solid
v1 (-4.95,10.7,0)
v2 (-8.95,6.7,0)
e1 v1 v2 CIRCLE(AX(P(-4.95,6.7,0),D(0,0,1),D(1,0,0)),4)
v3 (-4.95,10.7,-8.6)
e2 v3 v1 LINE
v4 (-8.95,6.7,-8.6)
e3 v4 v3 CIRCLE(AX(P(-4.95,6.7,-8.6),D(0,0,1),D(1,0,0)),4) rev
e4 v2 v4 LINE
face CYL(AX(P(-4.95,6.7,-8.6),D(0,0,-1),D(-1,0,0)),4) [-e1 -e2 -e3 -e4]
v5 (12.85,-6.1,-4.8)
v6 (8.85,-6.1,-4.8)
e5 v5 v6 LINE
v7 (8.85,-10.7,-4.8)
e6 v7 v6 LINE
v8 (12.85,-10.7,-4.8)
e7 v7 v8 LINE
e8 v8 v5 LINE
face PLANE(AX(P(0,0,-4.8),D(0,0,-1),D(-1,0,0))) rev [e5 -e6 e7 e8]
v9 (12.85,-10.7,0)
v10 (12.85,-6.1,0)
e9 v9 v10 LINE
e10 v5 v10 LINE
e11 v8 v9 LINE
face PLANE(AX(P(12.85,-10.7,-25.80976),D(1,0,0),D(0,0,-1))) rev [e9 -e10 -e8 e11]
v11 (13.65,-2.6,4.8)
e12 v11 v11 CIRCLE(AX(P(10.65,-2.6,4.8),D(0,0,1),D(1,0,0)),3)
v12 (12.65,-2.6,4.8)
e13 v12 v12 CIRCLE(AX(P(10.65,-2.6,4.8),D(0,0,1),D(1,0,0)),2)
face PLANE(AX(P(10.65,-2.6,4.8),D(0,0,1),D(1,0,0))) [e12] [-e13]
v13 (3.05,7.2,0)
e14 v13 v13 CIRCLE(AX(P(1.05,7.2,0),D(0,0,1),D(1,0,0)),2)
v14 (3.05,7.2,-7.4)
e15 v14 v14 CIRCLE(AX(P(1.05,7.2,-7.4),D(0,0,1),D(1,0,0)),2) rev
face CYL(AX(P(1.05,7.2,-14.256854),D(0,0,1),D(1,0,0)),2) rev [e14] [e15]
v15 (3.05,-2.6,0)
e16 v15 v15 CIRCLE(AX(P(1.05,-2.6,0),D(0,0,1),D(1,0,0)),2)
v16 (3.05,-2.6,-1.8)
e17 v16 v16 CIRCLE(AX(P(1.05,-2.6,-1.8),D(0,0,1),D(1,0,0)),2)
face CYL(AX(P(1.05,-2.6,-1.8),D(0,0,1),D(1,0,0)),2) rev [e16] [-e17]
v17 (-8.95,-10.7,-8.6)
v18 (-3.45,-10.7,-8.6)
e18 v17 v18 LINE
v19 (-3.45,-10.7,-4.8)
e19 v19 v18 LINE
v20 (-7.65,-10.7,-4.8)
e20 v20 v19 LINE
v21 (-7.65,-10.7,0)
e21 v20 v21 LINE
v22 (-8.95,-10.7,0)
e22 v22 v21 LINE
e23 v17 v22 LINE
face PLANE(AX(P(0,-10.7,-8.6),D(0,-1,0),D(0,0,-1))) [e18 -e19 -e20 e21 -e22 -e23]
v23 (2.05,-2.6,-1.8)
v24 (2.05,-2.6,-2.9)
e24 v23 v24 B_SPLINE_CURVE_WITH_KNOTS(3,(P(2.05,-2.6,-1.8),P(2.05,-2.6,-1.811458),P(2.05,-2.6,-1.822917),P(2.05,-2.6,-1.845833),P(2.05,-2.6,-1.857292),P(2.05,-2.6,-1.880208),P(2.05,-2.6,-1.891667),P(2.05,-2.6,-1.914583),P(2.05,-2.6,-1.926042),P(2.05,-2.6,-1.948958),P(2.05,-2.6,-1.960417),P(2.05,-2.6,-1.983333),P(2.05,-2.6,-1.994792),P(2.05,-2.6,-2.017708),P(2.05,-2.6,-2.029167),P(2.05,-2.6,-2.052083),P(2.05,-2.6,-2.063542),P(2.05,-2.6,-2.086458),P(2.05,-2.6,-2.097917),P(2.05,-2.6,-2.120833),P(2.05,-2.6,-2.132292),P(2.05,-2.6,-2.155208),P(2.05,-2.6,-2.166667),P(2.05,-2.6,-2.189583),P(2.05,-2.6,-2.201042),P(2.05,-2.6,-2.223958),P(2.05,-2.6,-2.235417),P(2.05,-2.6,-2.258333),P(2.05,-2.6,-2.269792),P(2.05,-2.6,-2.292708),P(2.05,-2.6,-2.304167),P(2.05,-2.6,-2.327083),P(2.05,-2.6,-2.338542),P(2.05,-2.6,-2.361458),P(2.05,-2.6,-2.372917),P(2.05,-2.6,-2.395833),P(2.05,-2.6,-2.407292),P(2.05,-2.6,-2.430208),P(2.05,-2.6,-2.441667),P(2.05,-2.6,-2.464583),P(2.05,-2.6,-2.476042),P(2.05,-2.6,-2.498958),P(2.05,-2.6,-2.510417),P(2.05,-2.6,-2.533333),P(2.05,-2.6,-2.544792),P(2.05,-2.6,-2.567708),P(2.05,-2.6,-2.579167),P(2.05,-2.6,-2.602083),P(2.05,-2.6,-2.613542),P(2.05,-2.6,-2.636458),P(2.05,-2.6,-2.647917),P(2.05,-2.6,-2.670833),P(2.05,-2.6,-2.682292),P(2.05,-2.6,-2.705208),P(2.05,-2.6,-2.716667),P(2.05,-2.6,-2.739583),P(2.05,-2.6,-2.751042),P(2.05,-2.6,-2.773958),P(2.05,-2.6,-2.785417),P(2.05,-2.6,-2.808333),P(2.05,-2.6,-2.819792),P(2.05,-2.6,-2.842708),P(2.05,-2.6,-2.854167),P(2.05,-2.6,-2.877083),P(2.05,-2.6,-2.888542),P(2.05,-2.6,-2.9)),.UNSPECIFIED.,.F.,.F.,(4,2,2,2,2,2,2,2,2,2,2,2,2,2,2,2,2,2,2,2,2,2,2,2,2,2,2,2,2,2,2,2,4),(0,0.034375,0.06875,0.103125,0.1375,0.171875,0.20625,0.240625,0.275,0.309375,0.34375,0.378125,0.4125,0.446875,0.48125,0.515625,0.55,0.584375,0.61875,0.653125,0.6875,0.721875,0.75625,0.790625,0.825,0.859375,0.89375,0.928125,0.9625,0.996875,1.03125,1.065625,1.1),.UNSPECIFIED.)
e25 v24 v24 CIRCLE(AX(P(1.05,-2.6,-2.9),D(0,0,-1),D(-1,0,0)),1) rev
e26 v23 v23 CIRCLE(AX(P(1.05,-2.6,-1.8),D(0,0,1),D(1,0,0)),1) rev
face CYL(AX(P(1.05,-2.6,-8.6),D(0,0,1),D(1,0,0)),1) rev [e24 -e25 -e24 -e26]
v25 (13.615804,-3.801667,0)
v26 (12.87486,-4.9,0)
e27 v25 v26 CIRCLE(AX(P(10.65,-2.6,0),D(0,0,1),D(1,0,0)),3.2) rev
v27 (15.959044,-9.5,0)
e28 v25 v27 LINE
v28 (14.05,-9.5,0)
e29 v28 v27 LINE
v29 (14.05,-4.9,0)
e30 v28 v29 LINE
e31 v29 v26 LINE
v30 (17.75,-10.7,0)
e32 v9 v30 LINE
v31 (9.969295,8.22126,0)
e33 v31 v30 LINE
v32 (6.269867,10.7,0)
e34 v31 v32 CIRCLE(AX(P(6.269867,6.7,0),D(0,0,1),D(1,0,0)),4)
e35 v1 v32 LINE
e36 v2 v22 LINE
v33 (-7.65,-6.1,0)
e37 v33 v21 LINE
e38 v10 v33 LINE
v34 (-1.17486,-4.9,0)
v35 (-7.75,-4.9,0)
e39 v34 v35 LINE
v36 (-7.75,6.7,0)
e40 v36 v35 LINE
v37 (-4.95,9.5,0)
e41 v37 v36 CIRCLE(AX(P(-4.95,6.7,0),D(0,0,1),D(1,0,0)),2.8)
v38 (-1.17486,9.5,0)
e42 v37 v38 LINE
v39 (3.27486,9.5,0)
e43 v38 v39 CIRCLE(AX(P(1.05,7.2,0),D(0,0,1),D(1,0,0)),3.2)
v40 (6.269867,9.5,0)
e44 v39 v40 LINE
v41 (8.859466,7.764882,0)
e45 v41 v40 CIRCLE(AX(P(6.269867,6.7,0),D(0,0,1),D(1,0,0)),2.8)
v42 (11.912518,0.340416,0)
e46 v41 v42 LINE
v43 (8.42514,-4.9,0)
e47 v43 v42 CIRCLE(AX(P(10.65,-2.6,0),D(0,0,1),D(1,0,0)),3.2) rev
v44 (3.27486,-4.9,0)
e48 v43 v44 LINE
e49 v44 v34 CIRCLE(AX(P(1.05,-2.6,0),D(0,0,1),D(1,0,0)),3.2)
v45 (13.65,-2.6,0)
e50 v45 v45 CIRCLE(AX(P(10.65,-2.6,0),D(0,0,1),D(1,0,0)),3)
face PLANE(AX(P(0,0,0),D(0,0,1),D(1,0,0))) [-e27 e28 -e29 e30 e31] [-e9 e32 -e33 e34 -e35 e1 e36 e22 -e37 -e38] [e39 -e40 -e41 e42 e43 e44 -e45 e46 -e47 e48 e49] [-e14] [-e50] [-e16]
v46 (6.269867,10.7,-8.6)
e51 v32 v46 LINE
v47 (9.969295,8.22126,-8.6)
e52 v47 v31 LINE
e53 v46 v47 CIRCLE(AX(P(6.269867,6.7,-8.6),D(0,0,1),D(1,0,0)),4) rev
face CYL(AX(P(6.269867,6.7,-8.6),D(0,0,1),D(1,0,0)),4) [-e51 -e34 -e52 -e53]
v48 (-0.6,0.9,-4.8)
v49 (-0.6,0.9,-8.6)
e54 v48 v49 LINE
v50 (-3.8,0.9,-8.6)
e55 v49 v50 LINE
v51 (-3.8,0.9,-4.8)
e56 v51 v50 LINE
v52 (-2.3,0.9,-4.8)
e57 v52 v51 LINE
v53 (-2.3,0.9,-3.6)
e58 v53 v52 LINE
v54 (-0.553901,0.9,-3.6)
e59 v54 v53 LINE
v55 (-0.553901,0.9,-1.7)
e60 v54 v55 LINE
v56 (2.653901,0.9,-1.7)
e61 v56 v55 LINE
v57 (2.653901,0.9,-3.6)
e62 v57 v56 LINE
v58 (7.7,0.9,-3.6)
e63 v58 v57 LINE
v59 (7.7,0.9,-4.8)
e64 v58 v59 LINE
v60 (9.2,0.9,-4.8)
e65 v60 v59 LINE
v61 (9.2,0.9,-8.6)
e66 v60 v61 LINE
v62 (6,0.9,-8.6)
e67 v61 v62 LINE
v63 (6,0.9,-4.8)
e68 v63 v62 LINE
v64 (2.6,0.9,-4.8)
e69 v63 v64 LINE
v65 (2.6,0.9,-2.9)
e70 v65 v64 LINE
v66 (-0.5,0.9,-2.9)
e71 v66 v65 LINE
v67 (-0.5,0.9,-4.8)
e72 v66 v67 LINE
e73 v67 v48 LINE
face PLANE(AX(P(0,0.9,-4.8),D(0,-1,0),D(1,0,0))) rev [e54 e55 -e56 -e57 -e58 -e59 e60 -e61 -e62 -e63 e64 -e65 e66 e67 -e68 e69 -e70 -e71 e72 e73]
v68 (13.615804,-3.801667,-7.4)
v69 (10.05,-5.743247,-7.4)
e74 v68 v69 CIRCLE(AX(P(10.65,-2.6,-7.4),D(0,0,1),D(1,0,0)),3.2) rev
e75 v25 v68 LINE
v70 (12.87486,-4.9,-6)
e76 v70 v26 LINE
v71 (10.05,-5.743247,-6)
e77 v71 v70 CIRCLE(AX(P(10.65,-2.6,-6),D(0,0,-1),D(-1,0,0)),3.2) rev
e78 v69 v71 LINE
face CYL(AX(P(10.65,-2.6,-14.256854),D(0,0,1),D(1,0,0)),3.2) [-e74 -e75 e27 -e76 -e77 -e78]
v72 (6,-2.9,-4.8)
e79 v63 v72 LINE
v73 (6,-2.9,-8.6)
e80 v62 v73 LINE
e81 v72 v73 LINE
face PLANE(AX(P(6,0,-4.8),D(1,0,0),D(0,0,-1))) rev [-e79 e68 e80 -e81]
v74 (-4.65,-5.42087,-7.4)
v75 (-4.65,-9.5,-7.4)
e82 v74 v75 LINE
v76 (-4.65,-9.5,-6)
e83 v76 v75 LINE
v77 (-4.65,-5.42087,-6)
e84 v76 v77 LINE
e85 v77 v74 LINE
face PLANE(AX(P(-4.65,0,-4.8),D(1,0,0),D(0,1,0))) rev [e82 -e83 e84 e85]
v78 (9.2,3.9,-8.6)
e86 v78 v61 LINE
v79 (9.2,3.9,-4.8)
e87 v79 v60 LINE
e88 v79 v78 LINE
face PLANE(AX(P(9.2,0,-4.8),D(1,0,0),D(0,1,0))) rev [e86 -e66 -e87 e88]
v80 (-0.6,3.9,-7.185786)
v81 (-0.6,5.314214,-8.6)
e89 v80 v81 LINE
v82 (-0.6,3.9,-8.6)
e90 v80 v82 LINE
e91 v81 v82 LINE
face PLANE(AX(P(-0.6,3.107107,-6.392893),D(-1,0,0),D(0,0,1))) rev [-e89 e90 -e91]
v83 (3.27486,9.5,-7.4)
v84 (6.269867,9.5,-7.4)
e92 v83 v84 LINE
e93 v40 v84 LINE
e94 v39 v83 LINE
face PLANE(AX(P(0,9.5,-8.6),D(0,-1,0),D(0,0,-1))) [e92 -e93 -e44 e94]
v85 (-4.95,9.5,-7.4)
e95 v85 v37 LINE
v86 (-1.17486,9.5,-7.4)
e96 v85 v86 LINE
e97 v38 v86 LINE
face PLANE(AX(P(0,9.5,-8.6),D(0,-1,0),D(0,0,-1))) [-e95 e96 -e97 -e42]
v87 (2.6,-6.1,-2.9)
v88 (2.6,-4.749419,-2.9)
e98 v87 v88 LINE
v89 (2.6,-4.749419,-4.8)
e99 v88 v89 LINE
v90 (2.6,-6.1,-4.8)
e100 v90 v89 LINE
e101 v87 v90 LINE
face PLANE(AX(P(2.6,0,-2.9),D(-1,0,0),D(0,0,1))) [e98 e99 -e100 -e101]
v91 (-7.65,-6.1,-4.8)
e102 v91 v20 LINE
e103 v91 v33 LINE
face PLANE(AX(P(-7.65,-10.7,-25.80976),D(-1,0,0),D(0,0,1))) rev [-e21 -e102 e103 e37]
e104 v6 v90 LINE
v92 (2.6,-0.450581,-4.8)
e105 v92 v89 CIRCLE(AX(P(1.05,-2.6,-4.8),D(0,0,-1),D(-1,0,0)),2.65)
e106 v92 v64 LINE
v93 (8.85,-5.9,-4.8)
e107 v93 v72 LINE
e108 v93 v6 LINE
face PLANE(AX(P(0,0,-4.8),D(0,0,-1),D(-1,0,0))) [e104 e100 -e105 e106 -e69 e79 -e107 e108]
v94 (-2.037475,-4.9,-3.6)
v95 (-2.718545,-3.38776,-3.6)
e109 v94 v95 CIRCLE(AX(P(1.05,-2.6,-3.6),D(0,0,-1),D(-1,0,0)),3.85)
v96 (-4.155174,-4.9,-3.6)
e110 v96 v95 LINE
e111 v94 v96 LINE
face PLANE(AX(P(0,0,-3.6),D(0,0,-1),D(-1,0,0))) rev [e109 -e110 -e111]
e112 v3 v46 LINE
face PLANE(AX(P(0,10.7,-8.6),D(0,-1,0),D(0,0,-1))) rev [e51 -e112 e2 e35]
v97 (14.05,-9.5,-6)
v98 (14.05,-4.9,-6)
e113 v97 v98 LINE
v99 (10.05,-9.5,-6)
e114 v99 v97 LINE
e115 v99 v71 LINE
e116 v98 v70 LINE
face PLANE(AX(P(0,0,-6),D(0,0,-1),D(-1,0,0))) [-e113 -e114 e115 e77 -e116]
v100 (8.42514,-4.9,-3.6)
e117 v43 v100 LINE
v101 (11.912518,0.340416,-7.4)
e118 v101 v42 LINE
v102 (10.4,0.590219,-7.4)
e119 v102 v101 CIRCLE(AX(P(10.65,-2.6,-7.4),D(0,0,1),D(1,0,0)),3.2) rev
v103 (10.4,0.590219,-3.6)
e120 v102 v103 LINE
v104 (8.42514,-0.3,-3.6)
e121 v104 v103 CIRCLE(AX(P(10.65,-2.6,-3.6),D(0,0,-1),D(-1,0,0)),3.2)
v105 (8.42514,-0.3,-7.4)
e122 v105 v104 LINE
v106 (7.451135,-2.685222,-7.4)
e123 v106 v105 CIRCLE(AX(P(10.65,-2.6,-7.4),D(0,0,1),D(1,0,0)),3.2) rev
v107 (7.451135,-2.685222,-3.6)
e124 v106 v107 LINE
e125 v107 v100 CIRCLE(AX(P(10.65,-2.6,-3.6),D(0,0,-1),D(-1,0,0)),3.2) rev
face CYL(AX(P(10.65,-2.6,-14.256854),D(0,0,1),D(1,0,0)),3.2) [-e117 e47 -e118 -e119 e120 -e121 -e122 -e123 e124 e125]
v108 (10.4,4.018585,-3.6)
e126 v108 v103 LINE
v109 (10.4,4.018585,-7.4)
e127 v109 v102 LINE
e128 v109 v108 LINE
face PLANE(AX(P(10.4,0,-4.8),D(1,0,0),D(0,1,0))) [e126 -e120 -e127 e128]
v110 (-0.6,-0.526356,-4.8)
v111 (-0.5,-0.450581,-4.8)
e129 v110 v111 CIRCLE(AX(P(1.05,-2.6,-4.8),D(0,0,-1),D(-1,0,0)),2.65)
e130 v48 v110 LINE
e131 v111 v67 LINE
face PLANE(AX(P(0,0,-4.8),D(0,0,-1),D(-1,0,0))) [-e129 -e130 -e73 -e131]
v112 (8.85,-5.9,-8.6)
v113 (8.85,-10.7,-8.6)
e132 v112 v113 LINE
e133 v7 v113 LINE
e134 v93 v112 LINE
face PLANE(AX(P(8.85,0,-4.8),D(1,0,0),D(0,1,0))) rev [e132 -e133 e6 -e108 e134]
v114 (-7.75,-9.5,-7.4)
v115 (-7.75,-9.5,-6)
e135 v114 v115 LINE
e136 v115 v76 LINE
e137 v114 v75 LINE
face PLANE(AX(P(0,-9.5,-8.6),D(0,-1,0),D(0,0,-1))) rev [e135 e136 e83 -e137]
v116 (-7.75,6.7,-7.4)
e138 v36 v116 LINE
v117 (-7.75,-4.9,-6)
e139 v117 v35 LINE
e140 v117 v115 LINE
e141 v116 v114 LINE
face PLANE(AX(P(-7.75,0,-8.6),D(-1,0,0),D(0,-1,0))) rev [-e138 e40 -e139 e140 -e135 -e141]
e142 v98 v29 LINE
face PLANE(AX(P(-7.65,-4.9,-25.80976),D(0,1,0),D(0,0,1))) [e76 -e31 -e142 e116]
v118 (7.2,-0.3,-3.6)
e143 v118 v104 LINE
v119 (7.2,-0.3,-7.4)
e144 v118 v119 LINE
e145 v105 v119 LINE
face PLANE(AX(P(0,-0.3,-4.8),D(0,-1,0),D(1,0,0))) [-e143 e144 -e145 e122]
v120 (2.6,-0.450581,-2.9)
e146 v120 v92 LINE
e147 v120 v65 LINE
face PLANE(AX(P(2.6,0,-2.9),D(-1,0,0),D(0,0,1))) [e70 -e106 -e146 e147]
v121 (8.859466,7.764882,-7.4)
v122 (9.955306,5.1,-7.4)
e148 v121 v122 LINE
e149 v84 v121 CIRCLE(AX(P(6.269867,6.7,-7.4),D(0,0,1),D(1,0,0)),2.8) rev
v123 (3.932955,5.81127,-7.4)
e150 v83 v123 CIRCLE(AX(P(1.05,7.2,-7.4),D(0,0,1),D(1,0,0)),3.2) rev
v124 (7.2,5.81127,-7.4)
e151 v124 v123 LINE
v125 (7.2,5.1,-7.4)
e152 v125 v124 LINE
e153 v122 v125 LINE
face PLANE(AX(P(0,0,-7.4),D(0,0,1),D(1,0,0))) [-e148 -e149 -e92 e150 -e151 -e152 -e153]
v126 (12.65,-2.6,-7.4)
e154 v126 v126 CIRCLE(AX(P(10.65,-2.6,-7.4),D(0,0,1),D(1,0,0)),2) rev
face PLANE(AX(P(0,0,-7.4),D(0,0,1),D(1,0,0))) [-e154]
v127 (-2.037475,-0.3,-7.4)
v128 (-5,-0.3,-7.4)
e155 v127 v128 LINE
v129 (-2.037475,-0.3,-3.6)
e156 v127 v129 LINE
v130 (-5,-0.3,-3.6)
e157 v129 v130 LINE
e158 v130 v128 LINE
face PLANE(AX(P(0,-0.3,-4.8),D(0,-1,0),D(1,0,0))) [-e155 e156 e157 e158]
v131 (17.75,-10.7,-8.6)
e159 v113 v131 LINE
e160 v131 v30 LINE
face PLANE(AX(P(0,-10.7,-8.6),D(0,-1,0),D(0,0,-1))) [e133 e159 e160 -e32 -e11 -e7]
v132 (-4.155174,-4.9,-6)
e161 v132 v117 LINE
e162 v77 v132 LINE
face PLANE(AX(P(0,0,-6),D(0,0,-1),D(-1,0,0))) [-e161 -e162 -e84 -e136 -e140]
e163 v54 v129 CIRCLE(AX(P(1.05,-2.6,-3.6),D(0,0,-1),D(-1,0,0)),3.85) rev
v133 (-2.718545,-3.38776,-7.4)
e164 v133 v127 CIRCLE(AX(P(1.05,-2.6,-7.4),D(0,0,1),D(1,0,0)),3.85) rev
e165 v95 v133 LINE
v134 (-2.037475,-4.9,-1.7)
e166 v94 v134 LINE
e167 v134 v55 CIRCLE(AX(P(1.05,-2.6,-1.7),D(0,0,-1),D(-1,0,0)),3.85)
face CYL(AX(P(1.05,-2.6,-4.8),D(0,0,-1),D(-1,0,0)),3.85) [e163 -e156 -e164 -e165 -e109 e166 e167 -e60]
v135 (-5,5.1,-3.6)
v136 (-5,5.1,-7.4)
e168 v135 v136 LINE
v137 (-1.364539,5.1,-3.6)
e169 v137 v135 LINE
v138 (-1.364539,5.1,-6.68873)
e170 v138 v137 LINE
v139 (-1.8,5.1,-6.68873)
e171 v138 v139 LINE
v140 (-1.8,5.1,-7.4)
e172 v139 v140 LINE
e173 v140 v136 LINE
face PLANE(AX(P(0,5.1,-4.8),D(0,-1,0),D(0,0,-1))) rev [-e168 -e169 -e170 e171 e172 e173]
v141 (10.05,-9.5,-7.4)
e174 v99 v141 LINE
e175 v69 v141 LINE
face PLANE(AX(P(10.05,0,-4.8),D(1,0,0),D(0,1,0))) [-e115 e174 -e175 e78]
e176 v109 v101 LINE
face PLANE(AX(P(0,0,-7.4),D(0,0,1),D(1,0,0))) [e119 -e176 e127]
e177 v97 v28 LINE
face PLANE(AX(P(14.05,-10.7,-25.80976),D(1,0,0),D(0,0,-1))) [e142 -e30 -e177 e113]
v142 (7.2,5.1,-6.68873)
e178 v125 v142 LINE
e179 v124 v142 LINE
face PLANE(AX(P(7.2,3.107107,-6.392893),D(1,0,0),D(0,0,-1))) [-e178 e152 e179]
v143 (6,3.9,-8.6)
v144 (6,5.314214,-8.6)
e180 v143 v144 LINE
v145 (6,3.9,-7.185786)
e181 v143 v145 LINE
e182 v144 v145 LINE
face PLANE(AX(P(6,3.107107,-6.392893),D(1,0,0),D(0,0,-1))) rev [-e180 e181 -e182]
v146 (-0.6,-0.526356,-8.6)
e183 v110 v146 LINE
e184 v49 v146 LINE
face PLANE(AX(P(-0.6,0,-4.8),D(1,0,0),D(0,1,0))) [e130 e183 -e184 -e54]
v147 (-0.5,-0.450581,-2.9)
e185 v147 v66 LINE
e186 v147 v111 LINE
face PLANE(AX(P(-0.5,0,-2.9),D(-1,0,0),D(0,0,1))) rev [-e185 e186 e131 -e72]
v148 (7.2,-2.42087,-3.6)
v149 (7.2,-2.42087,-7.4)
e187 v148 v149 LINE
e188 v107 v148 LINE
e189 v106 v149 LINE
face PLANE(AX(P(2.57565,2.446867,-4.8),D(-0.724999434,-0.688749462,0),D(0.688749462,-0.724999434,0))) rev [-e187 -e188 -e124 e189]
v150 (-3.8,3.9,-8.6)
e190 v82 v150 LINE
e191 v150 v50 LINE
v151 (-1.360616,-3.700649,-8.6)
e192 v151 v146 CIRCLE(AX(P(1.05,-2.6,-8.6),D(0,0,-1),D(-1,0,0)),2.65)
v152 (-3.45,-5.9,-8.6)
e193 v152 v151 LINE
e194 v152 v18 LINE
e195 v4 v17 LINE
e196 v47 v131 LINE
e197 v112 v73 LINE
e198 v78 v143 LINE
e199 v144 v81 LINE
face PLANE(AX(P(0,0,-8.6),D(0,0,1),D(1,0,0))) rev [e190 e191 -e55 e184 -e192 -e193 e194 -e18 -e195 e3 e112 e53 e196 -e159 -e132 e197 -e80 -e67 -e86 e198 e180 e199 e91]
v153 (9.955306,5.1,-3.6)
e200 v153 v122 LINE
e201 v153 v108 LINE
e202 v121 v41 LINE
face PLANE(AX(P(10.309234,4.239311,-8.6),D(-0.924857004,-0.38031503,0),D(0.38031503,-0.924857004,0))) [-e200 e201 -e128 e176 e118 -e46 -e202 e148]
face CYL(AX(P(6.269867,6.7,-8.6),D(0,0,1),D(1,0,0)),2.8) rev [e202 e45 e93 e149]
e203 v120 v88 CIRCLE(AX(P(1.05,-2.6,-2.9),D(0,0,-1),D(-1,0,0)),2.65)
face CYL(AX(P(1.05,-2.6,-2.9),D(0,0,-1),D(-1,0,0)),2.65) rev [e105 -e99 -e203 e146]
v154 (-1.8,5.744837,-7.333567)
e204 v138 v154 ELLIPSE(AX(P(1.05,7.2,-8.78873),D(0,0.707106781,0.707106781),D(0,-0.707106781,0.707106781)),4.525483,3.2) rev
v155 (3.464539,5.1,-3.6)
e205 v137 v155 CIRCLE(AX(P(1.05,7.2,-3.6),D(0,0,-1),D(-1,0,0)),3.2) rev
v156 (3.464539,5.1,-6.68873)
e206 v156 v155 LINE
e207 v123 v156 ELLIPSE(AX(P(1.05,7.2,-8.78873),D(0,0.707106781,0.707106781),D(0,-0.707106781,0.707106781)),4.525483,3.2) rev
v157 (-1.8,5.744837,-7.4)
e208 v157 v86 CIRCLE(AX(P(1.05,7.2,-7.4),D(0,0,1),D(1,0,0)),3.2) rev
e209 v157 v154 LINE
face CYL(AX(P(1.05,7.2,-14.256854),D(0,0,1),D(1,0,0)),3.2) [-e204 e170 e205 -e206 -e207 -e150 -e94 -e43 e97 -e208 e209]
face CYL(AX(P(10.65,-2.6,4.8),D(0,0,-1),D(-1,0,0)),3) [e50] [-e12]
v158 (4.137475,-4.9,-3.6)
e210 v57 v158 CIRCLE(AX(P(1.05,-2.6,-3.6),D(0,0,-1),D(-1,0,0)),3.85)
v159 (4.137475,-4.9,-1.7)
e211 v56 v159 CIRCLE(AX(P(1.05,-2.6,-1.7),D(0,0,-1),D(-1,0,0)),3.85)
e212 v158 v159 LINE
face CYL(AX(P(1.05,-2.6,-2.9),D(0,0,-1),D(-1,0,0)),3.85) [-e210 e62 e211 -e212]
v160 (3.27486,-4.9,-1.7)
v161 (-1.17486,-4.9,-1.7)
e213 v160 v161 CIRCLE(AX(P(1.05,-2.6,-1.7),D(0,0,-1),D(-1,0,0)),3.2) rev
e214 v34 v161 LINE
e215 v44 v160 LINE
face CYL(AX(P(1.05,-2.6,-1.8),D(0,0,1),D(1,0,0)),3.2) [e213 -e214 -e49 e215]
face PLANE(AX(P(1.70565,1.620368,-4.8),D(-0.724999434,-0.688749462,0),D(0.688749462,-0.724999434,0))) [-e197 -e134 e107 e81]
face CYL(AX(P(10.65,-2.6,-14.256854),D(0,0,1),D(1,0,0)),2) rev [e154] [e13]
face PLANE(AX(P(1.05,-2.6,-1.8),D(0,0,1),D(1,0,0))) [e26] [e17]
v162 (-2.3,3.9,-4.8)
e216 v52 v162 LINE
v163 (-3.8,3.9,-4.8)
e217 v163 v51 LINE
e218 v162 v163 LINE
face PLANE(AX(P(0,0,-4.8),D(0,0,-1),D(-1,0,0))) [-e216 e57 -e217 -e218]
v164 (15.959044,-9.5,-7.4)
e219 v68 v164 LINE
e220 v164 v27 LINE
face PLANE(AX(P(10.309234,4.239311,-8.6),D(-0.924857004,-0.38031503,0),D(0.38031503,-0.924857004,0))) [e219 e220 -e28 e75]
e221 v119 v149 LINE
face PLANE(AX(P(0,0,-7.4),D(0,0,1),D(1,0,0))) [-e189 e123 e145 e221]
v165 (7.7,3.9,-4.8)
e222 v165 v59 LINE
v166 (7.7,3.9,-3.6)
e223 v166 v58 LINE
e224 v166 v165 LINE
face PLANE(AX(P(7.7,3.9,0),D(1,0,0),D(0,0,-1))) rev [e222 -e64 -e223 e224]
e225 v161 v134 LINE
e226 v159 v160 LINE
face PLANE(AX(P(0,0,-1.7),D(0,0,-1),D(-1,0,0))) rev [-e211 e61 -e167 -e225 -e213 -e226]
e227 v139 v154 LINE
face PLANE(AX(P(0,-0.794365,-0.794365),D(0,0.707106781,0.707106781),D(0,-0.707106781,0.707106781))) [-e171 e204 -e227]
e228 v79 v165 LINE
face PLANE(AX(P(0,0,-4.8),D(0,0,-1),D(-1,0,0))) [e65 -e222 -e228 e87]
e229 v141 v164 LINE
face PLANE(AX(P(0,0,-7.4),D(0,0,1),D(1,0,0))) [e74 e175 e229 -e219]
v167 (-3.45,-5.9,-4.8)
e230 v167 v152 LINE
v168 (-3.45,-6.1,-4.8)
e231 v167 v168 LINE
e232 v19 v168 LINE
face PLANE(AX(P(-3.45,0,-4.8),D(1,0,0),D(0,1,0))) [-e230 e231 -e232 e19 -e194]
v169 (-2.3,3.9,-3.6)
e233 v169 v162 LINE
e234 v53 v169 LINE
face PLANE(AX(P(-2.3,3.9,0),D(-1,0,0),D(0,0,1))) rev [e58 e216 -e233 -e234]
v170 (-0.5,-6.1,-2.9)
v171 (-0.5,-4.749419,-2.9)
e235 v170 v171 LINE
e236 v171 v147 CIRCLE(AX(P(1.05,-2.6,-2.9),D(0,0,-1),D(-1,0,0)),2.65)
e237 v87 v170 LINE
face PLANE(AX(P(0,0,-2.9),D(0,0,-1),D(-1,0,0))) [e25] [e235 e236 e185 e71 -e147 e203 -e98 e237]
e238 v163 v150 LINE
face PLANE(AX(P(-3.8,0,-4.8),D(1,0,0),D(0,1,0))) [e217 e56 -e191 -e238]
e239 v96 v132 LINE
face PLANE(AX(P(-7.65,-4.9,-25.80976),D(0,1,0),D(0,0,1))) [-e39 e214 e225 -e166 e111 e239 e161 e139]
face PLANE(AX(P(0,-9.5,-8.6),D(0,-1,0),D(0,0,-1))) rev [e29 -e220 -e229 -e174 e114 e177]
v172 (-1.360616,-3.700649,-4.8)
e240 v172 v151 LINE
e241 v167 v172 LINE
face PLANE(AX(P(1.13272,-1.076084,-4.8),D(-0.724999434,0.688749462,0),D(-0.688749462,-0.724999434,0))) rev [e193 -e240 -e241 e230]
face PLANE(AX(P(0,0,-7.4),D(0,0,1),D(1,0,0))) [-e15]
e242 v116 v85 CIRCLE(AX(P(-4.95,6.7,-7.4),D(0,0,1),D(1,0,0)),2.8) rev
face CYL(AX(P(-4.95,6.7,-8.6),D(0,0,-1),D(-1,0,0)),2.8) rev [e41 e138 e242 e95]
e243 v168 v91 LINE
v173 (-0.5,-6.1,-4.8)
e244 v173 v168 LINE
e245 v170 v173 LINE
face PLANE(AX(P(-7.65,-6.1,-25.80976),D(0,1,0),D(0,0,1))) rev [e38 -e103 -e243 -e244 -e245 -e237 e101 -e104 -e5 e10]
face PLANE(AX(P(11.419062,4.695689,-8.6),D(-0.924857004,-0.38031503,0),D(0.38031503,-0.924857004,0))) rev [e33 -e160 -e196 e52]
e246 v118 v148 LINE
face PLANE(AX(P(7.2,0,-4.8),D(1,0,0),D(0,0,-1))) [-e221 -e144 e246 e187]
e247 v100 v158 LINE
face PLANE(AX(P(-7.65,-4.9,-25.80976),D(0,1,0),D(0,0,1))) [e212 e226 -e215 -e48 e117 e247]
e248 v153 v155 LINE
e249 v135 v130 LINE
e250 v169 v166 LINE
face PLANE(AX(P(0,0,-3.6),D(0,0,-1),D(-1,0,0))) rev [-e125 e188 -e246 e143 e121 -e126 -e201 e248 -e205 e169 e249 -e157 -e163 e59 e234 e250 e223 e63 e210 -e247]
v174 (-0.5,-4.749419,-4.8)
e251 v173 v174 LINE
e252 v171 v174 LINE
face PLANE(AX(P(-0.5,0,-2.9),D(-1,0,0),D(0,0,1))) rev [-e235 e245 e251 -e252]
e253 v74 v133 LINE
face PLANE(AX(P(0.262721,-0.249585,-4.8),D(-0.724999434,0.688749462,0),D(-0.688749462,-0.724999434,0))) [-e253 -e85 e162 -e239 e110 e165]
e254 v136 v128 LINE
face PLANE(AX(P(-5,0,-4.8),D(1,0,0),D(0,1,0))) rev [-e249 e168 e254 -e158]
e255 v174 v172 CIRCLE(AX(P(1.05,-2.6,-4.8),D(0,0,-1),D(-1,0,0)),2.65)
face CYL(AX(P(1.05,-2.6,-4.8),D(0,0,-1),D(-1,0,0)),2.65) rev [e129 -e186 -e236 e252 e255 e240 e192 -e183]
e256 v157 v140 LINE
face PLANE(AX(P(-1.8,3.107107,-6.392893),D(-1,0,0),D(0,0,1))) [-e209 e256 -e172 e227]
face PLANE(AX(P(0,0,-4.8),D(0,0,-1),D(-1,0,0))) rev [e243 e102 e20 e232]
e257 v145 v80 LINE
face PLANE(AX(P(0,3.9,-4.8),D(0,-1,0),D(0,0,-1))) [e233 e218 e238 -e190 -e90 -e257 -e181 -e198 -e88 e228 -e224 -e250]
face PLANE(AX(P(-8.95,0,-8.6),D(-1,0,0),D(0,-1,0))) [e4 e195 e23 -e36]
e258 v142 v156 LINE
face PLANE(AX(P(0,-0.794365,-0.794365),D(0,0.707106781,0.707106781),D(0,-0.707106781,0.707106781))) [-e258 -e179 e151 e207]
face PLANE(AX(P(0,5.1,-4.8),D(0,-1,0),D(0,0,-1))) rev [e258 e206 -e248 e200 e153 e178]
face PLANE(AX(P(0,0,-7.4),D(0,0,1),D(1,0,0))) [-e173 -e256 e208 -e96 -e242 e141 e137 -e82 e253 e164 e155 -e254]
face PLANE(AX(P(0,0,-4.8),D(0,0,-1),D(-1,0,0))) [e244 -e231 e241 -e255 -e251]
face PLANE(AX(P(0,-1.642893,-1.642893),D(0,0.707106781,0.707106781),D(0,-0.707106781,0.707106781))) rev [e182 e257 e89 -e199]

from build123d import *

# Parameters (mm, degrees)
SKETCH1_W           = 17.9
SKETCH1_H           = 21.4
SKETCH1_R           = 1
BOSS_EXTRUDE1_DEPTH = 8.6
FILLET1_R           = 4
SKETCH2_R           = 2
CUT_EXTRUDE1_DEPTH  = 1.8
CUT_EXTRUDE2_START  = -3.8
SKETCH4_R           = 2.65
SKETCH4_W           = 6.6
SKETCH4_H           = 3.8
SKETCH4_W_2         = 12.3
SKETCH4_H_2         = 4.8
CUT_EXTRUDE2_DEPTH  = 3.8
SKETCH5_W           = 10
SKETCH5_H           = 3
CUT_EXTRUDE3_DEPTH  = 22.27422149
CUT_EXTRUDE4_START  = -1.9
SKETCH6_R           = 1
CUT_EXTRUDE4_DEPTH  = 1.9
SKETCH7_W           = 20.5
SKETCH7_H           = 4.6
CUT_EXTRUDE5_DEPTH  = 4.8
SKETCH9_W           = 6.6
SKETCH9_H           = 5
CUT_EXTRUDE6_DEPTH  = 1
SKETCH3_R           = 2
CUT_EXTRUDE7_DEPTH  = 7.4
SKETCH10_R          = 3
BOSS_EXTRUDE2_DEPTH = 4.8
SKETCH11_R          = 2
CUT_EXTRUDE8_DEPTH  = 12.2
SHELL1_START        = -6.688730163
SHELL1_DEPTH        = 6.688730163
SHELL1_START_2      = -3.6
SHELL1_2_OUTLINE_W  = 1.5
SHELL1_2_OUTLINE_H  = 5.4
SHELL1_2_DEPTH      = 3.6
SHELL1_START_3      = -7.4
SHELL1_3_DEPTH      = 1.4
SHELL1_START_4      = -1.7
SHELL1_4_DEPTH      = 1.7
SHELL1_5_DEPTH      = 0.711269837
SHELL1_START_5      = -7.333566942
SHELL1_6_DEPTH      = 0.644836779
SHELL1_START_6      = 3.274859546
SHELL1_7_DEPTH      = 3.925140454
SHELL1_START_7      = -1.8
SHELL1_8_DEPTH      = 0.435460706
CUT_EXTRUDE9_START  = -3.6
CUT_EXTRUDE9_DEPTH  = 3.6
CUT_EXTRUDE10_START = -1.7
CUT_EXTRUDE10_DEPTH = 1.7


with BuildPart() as part:
    # Sketch1 → Boss-Extrude1 (new body)
    # profile 1 of 2: a face of its own
    with BuildSketch(Plane.XY):
        Rectangle(SKETCH1_W, SKETCH1_H)
        with Locations((1.05, -2.6)):
            Circle(SKETCH1_R, mode=Mode.SUBTRACT)
    # profile 2 of 2: a face of its own
    with BuildSketch(Plane.XY):
        Polygon((17.75, -10.7), (8.95, -10.7), (8.95, 10.7), align=None)
    extrude(amount=-BOSS_EXTRUDE1_DEPTH)

    # Fillet1
    fillet1_edges = [part.edges().sort_by_distance(p)[0] for p in [
        (-8.95, 10.7, -4.3),
        (8.95, 10.7, -4.3),
    ]]
    fillet(fillet1_edges, radius=FILLET1_R)

    # Sketch2 → Cut-Extrude1 (cut)
    with BuildSketch(Plane.XY):
        with Locations((1.05, -2.6)):
            Circle(SKETCH2_R)
    extrude(amount=-CUT_EXTRUDE1_DEPTH, mode=Mode.SUBTRACT)

    # Sketch4 → Cut-Extrude2 (cut)
    with BuildSketch(Plane(origin=(0, 0, -8.6), x_dir=(-1, 0, 0), z_dir=(0, 0, -1)).offset(CUT_EXTRUDE2_START)):
        Polygon((-9.2, 0.9), (-6, 0.9), (0.6, 0.9), (3.8, 0.9), (3.8, 3.9), (-9.2, 3.9), align=None)
        with Locations((-1.05, -2.6)):
            Circle(SKETCH4_R)
        with Locations((-2.7, -1)):
            Rectangle(SKETCH4_W, SKETCH4_H)
        with BuildLine():
            ThreePointArc((0.6, -0.526355865), (-2.334562661, -0.28215644), (-3.682964109, -2.9))
            Line((-3.682964109, -2.9), (-2.003939201, -2.9))
            ThreePointArc((-2.003939201, -2.9), (-1.201757699, -1.611582274), (-0.05, -2.6))
            ThreePointArc((-0.05, -2.6), (-0.061582274, -2.751757699), (-0.096060799, -2.9))
            Line((-0.096060799, -2.9), (0.6, -2.9))
            Line((0.6, -2.9), (0.6, -0.526355865))
        make_face()
        with BuildLine():
            Line((-2.003939201, -2.9), (-3.682964109, -2.9))
            ThreePointArc((-3.682964109, -2.9), (-1.465474787, -5.217227675), (1.360616498, -3.700648945))
            Line((1.360616498, -3.700648945), (0.6, -2.9))
            Line((0.6, -2.9), (-0.096060799, -2.9))
            ThreePointArc((-0.096060799, -2.9), (-1.05, -3.6), (-2.003939201, -2.9))
        make_face()
        with BuildLine():
            Line((0.6, -2.9), (1.360616498, -3.700648945))
            ThreePointArc((1.360616498, -3.700648945), (1.539462658, -3.163190146), (1.6, -2.6))
            ThreePointArc((1.6, -2.6), (1.336943652, -1.448913557), (0.6, -0.526355865))
            Line((0.6, -0.526355865), (0.6, -2.9))
        make_face()
        Polygon((-6, -2.9), (0.6, -2.9), (3.45, -5.9), (-8.85, -5.9), align=None)
        with Locations((-2.7, -8.3)):
            Rectangle(SKETCH4_W_2, SKETCH4_H_2)
    extrude(amount=CUT_EXTRUDE2_DEPTH, mode=Mode.SUBTRACT)

    # Sketch5 → Cut-Extrude3 (cut, through all)
    with BuildSketch(Plane(origin=(0, 0, -4.8), x_dir=(-1, 0, 0), z_dir=(0, 0, -1))):
        with Locations((-2.7, 2.4)):
            Rectangle(SKETCH5_W, SKETCH5_H)
    extrude(amount=-CUT_EXTRUDE3_DEPTH, mode=Mode.SUBTRACT)

    # Sketch6 → Cut-Extrude4 (cut)
    # profile 1 of 5: a face of its own
    with BuildSketch(Plane(origin=(0, 0, -4.8), x_dir=(-1, 0, 0), z_dir=(0, 0, -1)).offset(CUT_EXTRUDE4_START)):
        with BuildLine():
            ThreePointArc((-2.6, -0.450581474), (-3.7, -2.6), (-2.6, -4.749418526))
            Line((-2.6, -4.749418526), (-2.6, -0.450581474))
        make_face()
    # profile 2 of 5: a face of its own
    with BuildSketch(Plane(origin=(0, 0, -4.8), x_dir=(-1, 0, 0), z_dir=(0, 0, -1)).offset(CUT_EXTRUDE4_START)):
        with BuildLine():
            Line((-2.6, -0.450581474), (-2.6, -4.749418526))
            ThreePointArc((-2.6, -4.749418526), (-1.05, -5.25), (0.5, -4.749418526))
            Line((0.5, -4.749418526), (0.5, -0.450581474))
            ThreePointArc((0.5, -0.450581474), (-1.05, 0.05), (-2.6, -0.450581474))
        make_face()
        with Locations(Location((-1.05, -2.6, 0), (0, 0, 180))):
            Circle(SKETCH6_R, mode=Mode.SUBTRACT)
    # profile 3 of 5: a face of its own
    with BuildSketch(Plane(origin=(0, 0, -4.8), x_dir=(-1, 0, 0), z_dir=(0, 0, -1)).offset(CUT_EXTRUDE4_START)):
        with BuildLine():
            Line((-2.6, 0.9), (-2.6, -0.450581474))
            ThreePointArc((-2.6, -0.450581474), (-1.05, 0.05), (0.5, -0.450581474))
            Line((0.5, -0.450581474), (0.5, 0.9))
            Line((0.5, 0.9), (-2.6, 0.9))
        make_face()
    # profile 4 of 5: a face of its own
    with BuildSketch(Plane(origin=(0, 0, -4.8), x_dir=(-1, 0, 0), z_dir=(0, 0, -1)).offset(CUT_EXTRUDE4_START)):
        with BuildLine():
            Line((0.5, -0.450581474), (0.5, -4.749418526))
            ThreePointArc((0.5, -4.749418526), (0.998560511, -4.281041294), (1.360616498, -3.700648945))
            ThreePointArc((1.360616498, -3.700648945), (1.539462658, -3.163190146), (1.6, -2.6))
            ThreePointArc((1.6, -2.6), (1.336943652, -1.448913557), (0.6, -0.526355865))
            ThreePointArc((0.6, -0.526355865), (0.550448512, -0.487876765), (0.5, -0.450581474))
        make_face()
    # profile 5 of 5: a face of its own
    with BuildSketch(Plane(origin=(0, 0, -4.8), x_dir=(-1, 0, 0), z_dir=(0, 0, -1)).offset(CUT_EXTRUDE4_START)):
        with BuildLine():
            Line((-2.6, -4.749418526), (-2.6, -6.1))
            Line((-2.6, -6.1), (0.5, -6.1))
            Line((0.5, -6.1), (0.5, -4.749418526))
            ThreePointArc((0.5, -4.749418526), (-1.05, -5.25), (-2.6, -4.749418526))
        make_face()
    extrude(amount=CUT_EXTRUDE4_DEPTH, mode=Mode.SUBTRACT)

    # Sketch7 → Cut-Extrude5 (cut)
    with BuildSketch(Plane.XY):
        with Locations((2.6, -8.4)):
            Rectangle(SKETCH7_W, SKETCH7_H)
    extrude(amount=-CUT_EXTRUDE5_DEPTH, mode=Mode.SUBTRACT)

    # Sketch9 → Cut-Extrude6 (cut)
    with BuildSketch(Plane(origin=(0, -2.35, -2.35), x_dir=(-1, 0, 0), z_dir=(0, -0.7071067811865561, -0.7071067811865389))):
        with Locations((-2.7, 9.217514421)):
            Rectangle(SKETCH9_W, SKETCH9_H)
    extrude(amount=-CUT_EXTRUDE6_DEPTH, mode=Mode.SUBTRACT)

    # Sketch3 → Cut-Extrude7 (cut)
    with BuildSketch(Plane.XY):
        with Locations((1.05, 7.2)):
            Circle(SKETCH3_R)
    extrude(amount=-CUT_EXTRUDE7_DEPTH, mode=Mode.SUBTRACT)

    # Sketch10 → Boss-Extrude2 (add)
    with BuildSketch(Plane.XY):
        with Locations((10.65, -2.6)):
            Circle(SKETCH10_R)
    extrude(amount=BOSS_EXTRUDE2_DEPTH)

    # Sketch11 → Cut-Extrude8 (cut)
    with BuildSketch(Plane.XY.offset(4.8)):
        with Locations((10.65, -2.6)):
            Circle(SKETCH11_R)
    extrude(amount=-CUT_EXTRUDE8_DEPTH, mode=Mode.SUBTRACT)

    # Shell1: read off the stored shape, not the designer's step
    # Shell1 outline → Shell1 (cut)
    with BuildSketch(Plane.XY.offset(SHELL1_START)):
        with BuildLine():
            Line((8.425140454, -0.3), (7.2, -0.3))
            Line((7.2, -0.3), (7.2, -2.420869782))
            Line((7.2, -2.420869782), (7.451135024, -2.685222439))
            ThreePointArc((7.451135024, -2.685222439), (7.687481064, -1.390255582), (8.425140454, -0.3))
        make_face()
        with BuildLine():
            Line((-4.155173707, -4.9), (-2.718545428, -3.387759707))
            ThreePointArc((-2.718545428, -3.387759707), (-2.709630033, -1.770734053), (-2.037474696, -0.3))
            Line((-2.037474696, -0.3), (-5, -0.3))
            Line((-5, -0.3), (-5, 5.1))
            Line((-5, 5.1), (-1.364539294, 5.1))
            ThreePointArc((-1.364539294, 5.1), (-2.147030716, 7.337820904), (-1.174859546, 9.5))
            Line((-1.174859546, 9.5), (-4.95, 9.5))
            ThreePointArc((-4.95, 9.5), (-6.929898987, 8.679898987), (-7.75, 6.7))
            Line((-7.75, 6.7), (-7.75, -4.9))
            Line((-7.75, -4.9), (-4.155173707, -4.9))
        make_face()
        with BuildLine():
            Line((12.874859546, -4.9), (14.05, -4.9))
            Line((14.05, -4.9), (14.05, -9.5))
            Line((14.05, -9.5), (15.959044178, -9.5))
            Line((15.959044178, -9.5), (13.615804478, -3.801667092))
            ThreePointArc((13.615804478, -3.801667092), (13.302797023, -4.389599942), (12.874859546, -4.9))
        make_face()
        with BuildLine():
            ThreePointArc((10.4, 0.590219428), (11.17143883, 0.557230043), (11.912517793, 0.340416437))
            Line((11.912517793, 0.340416437), (10.4, 4.018584707))
            Line((10.4, 4.018584707), (10.4, 0.590219428))
        make_face()
        with BuildLine():
            Line((7.2, 5.1), (9.955305861, 5.1))
            Line((9.955305861, 5.1), (8.859466499, 7.764882083))
            ThreePointArc((8.859466499, 7.764882083), (7.828444792, 9.026120142), (6.269866888, 9.5))
            Line((6.269866888, 9.5), (3.274859546, 9.5))
            ThreePointArc((3.274859546, 9.5), (4.247030716, 7.337820904), (3.464539294, 5.1))
            Line((3.464539294, 5.1), (7.2, 5.1))
        make_face()
    extrude(amount=SHELL1_DEPTH, mode=Mode.SUBTRACT)

    # Shell1 2 outline → Shell1 2 (cut)
    with BuildSketch(Plane.XY.offset(SHELL1_START_2)):
        with BuildLine():
            Line((7.2, -0.3), (4.137474696, -0.3))
            ThreePointArc((4.137474696, -0.3), (4.9, -2.6), (4.137474696, -4.9))
            Line((4.137474696, -4.9), (8.425140454, -4.9))
            ThreePointArc((8.425140454, -4.9), (7.720749783, -3.888213168), (7.451135024, -2.685222439))
            Line((7.451135024, -2.685222439), (7.2, -2.420869782))
            Line((7.2, -2.420869782), (7.2, -0.3))
        make_face()
        with BuildLine():
            Line((-4.155173707, -4.9), (-2.037474696, -4.9))
            ThreePointArc((-2.037474696, -4.9), (-2.460408902, -4.180989987), (-2.718545428, -3.387759707))
            Line((-2.718545428, -3.387759707), (-4.155173707, -4.9))
        make_face()
        with Locations((-4.25, 2.4)):
            Rectangle(SHELL1_2_OUTLINE_W, SHELL1_2_OUTLINE_H)
        with BuildLine():
            ThreePointArc((8.9, 0.079085665), (9.617859297, 0.428974342), (10.4, 0.590219428))
            Line((10.4, 0.590219428), (10.4, 4.018584707))
            Line((10.4, 4.018584707), (9.95530586, 5.1))
            Line((9.95530586, 5.1), (8.9, 5.1))
            Line((8.9, 5.1), (8.9, 0.079085665))
        make_face()
    extrude(amount=SHELL1_2_DEPTH, mode=Mode.SUBTRACT)

    # Shell1 3 outline → Shell1 3 (cut)
    with BuildSketch(Plane.XY.offset(SHELL1_START_3)):
        with BuildLine():
            Line((8.425140454, -0.3), (7.2, -0.3))
            Line((7.2, -0.3), (7.2, -2.420869782))
            Line((7.2, -2.420869782), (7.451135024, -2.685222439))
            ThreePointArc((7.451135024, -2.685222439), (7.687481064, -1.390255582), (8.425140454, -0.3))
        make_face()
        with BuildLine():
            ThreePointArc((-2.718545428, -3.387759707), (-2.709630033, -1.770734053), (-2.037474696, -0.3))
            Line((-2.037474696, -0.3), (-5, -0.3))
            Line((-5, -0.3), (-5, 5.1))
            Line((-5, 5.1), (-1.8, 5.1))
            Line((-1.8, 5.1), (-1.8, 5.744836779))
            ThreePointArc((-1.8, 5.744836779), (-2.106558657, 7.725487814), (-1.174859546, 9.5))
            Line((-1.174859546, 9.5), (-4.95, 9.5))
            ThreePointArc((-4.95, 9.5), (-6.929898987, 8.679898987), (-7.75, 6.7))
            Line((-7.75, 6.7), (-7.75, -9.5))
            Line((-7.75, -9.5), (-4.65, -9.5))
            Line((-4.65, -9.5), (-4.65, -5.420869782))
            Line((-4.65, -5.420869782), (-2.718545428, -3.387759707))
        make_face()
        with BuildLine():
            Line((10.05, -9.5), (15.959044178, -9.5))
            Line((15.959044178, -9.5), (13.615804478, -3.801667092))
            ThreePointArc((13.615804478, -3.801667092), (12.180258337, -5.410393108), (10.05, -5.743246729))
            Line((10.05, -5.743246729), (10.05, -9.5))
        make_face()
        with BuildLine():
            ThreePointArc((10.4, 0.590219428), (11.17143883, 0.557230043), (11.912517793, 0.340416437))
            Line((11.912517793, 0.340416437), (10.4, 4.018584707))
            Line((10.4, 4.018584707), (10.4, 0.590219428))
        make_face()
    extrude(amount=SHELL1_3_DEPTH, mode=Mode.SUBTRACT)

    # Shell1 4 outline → Shell1 4 (cut)
    with BuildSketch(Plane.XY.offset(SHELL1_START_4)):
        with BuildLine():
            ThreePointArc((4.137474696, -4.9), (4.9, -2.6), (4.137474696, -0.3))
            Line((4.137474696, -0.3), (3.274859546, -0.3))
            ThreePointArc((3.274859546, -0.3), (4.25, -2.6), (3.274859546, -4.9))
            Line((3.274859546, -4.9), (4.137474696, -4.9))
        make_face()
        with BuildLine():
            ThreePointArc((-2.037474696, -0.3), (-2.8, -2.6), (-2.037474696, -4.9))
            Line((-2.037474696, -4.9), (-1.174859546, -4.9))
            ThreePointArc((-1.174859546, -4.9), (-2.15, -2.6), (-1.174859546, -0.3))
            Line((-1.174859546, -0.3), (-2.037474696, -0.3))
        make_face()
    extrude(amount=SHELL1_4_DEPTH, mode=Mode.SUBTRACT)

    # Shell1 5 outline → Shell1 5 (cut)
    with BuildSketch(Plane.XY.offset(SHELL1_START_3)):
        with BuildLine():
            Line((9.95530586, 5.1), (8.859466499, 7.764882083))
            ThreePointArc((8.859466499, 7.764882083), (7.828444792, 9.026120142), (6.269866888, 9.5))
            Line((6.269866888, 9.5), (3.274859546, 9.5))
            ThreePointArc((3.274859546, 9.5), (4.247030716, 7.337820904), (3.464539294, 5.1))
            Line((3.464539294, 5.1), (7.2, 5.1))
            Line((7.2, 5.1), (9.95530586, 5.1))
        make_face()
    extrude(amount=SHELL1_5_DEPTH, mode=Mode.SUBTRACT)

    # Shell1 6 outline → Shell1 6 (cut)
    with BuildSketch(Plane.XY.offset(SHELL1_START_5)):
        with BuildLine():
            ThreePointArc((-1.364539294, 5.1), (-1.60194214, 5.409133481), (-1.8, 5.744836779))
            Line((-1.8, 5.744836779), (-1.8, 5.1))
            Line((-1.8, 5.1), (-1.364539294, 5.1))
        make_face()
    extrude(amount=SHELL1_6_DEPTH, mode=Mode.SUBTRACT)

    # Shell1 7 outline → Shell1 7 (add)
    with BuildSketch(Plane.YZ.offset(SHELL1_START_6)):
        Polygon((5.1, -7.4), (5.811269837, -7.4), (5.1, -6.688730163), align=None)
    extrude(amount=SHELL1_7_DEPTH)

    # Shell1 8 outline → Shell1 8 (add)
    with BuildSketch(Plane.YZ.offset(SHELL1_START_7)):
        Polygon((5.1, -7.333566942), (5.744836779, -7.333566942), (5.1, -6.688730163), align=None)
    extrude(amount=SHELL1_8_DEPTH)

    # Sketch14 → Cut-Extrude9 (cut)
    with BuildSketch(Plane.XY.offset(CUT_EXTRUDE9_START)):
        with BuildLine():
            Line((-1.364539294, 5.1), (-3.5, 5.1))
            Line((-3.5, 5.1), (-3.5, -0.3))
            Line((-3.5, -0.3), (-2.037474696, -0.3))
            ThreePointArc((-2.037474696, -0.3), (-1.371208921, 0.393367228), (-0.553901493, 0.9))
            Line((-0.553901493, 0.9), (-2.3, 0.9))
            Line((-2.3, 0.9), (-2.3, 3.9))
            Line((-2.3, 3.9), (7.7, 3.9))
            Line((7.7, 3.9), (7.7, 0.9))
            Line((7.7, 0.9), (2.653901493, 0.9))
            ThreePointArc((2.653901493, 0.9), (3.471208921, 0.393367228), (4.137474696, -0.3))
            Line((4.137474696, -0.3), (8.425140454, -0.3))
            ThreePointArc((8.425140454, -0.3), (8.653552258, -0.099160858), (8.9, 0.079085665))
            Line((8.9, 0.079085665), (8.9, 5.1))
            Line((8.9, 5.1), (3.464539294, 5.1))
            ThreePointArc((3.464539294, 5.1), (1.05, 4), (-1.364539294, 5.1))
        make_face()
    extrude(amount=CUT_EXTRUDE9_DEPTH, mode=Mode.SUBTRACT)

    # Sketch15 → Cut-Extrude10 (cut)
    with BuildSketch(Plane.XY.offset(CUT_EXTRUDE10_START)):
        with BuildLine():
            ThreePointArc((-0.553901493, 0.9), (-1.371208921, 0.393367228), (-2.037474696, -0.3))
            Line((-2.037474696, -0.3), (-1.174859546, -0.3))
            ThreePointArc((-1.174859546, -0.3), (1.05, 0.6), (3.274859546, -0.3))
            Line((3.274859546, -0.3), (4.137474696, -0.3))
            ThreePointArc((4.137474696, -0.3), (3.471208921, 0.393367228), (2.653901493, 0.9))
            Line((2.653901493, 0.9), (-0.553901493, 0.9))
        make_face()
    extrude(amount=CUT_EXTRUDE10_DEPTH, mode=Mode.SUBTRACT)


solid = part.part
